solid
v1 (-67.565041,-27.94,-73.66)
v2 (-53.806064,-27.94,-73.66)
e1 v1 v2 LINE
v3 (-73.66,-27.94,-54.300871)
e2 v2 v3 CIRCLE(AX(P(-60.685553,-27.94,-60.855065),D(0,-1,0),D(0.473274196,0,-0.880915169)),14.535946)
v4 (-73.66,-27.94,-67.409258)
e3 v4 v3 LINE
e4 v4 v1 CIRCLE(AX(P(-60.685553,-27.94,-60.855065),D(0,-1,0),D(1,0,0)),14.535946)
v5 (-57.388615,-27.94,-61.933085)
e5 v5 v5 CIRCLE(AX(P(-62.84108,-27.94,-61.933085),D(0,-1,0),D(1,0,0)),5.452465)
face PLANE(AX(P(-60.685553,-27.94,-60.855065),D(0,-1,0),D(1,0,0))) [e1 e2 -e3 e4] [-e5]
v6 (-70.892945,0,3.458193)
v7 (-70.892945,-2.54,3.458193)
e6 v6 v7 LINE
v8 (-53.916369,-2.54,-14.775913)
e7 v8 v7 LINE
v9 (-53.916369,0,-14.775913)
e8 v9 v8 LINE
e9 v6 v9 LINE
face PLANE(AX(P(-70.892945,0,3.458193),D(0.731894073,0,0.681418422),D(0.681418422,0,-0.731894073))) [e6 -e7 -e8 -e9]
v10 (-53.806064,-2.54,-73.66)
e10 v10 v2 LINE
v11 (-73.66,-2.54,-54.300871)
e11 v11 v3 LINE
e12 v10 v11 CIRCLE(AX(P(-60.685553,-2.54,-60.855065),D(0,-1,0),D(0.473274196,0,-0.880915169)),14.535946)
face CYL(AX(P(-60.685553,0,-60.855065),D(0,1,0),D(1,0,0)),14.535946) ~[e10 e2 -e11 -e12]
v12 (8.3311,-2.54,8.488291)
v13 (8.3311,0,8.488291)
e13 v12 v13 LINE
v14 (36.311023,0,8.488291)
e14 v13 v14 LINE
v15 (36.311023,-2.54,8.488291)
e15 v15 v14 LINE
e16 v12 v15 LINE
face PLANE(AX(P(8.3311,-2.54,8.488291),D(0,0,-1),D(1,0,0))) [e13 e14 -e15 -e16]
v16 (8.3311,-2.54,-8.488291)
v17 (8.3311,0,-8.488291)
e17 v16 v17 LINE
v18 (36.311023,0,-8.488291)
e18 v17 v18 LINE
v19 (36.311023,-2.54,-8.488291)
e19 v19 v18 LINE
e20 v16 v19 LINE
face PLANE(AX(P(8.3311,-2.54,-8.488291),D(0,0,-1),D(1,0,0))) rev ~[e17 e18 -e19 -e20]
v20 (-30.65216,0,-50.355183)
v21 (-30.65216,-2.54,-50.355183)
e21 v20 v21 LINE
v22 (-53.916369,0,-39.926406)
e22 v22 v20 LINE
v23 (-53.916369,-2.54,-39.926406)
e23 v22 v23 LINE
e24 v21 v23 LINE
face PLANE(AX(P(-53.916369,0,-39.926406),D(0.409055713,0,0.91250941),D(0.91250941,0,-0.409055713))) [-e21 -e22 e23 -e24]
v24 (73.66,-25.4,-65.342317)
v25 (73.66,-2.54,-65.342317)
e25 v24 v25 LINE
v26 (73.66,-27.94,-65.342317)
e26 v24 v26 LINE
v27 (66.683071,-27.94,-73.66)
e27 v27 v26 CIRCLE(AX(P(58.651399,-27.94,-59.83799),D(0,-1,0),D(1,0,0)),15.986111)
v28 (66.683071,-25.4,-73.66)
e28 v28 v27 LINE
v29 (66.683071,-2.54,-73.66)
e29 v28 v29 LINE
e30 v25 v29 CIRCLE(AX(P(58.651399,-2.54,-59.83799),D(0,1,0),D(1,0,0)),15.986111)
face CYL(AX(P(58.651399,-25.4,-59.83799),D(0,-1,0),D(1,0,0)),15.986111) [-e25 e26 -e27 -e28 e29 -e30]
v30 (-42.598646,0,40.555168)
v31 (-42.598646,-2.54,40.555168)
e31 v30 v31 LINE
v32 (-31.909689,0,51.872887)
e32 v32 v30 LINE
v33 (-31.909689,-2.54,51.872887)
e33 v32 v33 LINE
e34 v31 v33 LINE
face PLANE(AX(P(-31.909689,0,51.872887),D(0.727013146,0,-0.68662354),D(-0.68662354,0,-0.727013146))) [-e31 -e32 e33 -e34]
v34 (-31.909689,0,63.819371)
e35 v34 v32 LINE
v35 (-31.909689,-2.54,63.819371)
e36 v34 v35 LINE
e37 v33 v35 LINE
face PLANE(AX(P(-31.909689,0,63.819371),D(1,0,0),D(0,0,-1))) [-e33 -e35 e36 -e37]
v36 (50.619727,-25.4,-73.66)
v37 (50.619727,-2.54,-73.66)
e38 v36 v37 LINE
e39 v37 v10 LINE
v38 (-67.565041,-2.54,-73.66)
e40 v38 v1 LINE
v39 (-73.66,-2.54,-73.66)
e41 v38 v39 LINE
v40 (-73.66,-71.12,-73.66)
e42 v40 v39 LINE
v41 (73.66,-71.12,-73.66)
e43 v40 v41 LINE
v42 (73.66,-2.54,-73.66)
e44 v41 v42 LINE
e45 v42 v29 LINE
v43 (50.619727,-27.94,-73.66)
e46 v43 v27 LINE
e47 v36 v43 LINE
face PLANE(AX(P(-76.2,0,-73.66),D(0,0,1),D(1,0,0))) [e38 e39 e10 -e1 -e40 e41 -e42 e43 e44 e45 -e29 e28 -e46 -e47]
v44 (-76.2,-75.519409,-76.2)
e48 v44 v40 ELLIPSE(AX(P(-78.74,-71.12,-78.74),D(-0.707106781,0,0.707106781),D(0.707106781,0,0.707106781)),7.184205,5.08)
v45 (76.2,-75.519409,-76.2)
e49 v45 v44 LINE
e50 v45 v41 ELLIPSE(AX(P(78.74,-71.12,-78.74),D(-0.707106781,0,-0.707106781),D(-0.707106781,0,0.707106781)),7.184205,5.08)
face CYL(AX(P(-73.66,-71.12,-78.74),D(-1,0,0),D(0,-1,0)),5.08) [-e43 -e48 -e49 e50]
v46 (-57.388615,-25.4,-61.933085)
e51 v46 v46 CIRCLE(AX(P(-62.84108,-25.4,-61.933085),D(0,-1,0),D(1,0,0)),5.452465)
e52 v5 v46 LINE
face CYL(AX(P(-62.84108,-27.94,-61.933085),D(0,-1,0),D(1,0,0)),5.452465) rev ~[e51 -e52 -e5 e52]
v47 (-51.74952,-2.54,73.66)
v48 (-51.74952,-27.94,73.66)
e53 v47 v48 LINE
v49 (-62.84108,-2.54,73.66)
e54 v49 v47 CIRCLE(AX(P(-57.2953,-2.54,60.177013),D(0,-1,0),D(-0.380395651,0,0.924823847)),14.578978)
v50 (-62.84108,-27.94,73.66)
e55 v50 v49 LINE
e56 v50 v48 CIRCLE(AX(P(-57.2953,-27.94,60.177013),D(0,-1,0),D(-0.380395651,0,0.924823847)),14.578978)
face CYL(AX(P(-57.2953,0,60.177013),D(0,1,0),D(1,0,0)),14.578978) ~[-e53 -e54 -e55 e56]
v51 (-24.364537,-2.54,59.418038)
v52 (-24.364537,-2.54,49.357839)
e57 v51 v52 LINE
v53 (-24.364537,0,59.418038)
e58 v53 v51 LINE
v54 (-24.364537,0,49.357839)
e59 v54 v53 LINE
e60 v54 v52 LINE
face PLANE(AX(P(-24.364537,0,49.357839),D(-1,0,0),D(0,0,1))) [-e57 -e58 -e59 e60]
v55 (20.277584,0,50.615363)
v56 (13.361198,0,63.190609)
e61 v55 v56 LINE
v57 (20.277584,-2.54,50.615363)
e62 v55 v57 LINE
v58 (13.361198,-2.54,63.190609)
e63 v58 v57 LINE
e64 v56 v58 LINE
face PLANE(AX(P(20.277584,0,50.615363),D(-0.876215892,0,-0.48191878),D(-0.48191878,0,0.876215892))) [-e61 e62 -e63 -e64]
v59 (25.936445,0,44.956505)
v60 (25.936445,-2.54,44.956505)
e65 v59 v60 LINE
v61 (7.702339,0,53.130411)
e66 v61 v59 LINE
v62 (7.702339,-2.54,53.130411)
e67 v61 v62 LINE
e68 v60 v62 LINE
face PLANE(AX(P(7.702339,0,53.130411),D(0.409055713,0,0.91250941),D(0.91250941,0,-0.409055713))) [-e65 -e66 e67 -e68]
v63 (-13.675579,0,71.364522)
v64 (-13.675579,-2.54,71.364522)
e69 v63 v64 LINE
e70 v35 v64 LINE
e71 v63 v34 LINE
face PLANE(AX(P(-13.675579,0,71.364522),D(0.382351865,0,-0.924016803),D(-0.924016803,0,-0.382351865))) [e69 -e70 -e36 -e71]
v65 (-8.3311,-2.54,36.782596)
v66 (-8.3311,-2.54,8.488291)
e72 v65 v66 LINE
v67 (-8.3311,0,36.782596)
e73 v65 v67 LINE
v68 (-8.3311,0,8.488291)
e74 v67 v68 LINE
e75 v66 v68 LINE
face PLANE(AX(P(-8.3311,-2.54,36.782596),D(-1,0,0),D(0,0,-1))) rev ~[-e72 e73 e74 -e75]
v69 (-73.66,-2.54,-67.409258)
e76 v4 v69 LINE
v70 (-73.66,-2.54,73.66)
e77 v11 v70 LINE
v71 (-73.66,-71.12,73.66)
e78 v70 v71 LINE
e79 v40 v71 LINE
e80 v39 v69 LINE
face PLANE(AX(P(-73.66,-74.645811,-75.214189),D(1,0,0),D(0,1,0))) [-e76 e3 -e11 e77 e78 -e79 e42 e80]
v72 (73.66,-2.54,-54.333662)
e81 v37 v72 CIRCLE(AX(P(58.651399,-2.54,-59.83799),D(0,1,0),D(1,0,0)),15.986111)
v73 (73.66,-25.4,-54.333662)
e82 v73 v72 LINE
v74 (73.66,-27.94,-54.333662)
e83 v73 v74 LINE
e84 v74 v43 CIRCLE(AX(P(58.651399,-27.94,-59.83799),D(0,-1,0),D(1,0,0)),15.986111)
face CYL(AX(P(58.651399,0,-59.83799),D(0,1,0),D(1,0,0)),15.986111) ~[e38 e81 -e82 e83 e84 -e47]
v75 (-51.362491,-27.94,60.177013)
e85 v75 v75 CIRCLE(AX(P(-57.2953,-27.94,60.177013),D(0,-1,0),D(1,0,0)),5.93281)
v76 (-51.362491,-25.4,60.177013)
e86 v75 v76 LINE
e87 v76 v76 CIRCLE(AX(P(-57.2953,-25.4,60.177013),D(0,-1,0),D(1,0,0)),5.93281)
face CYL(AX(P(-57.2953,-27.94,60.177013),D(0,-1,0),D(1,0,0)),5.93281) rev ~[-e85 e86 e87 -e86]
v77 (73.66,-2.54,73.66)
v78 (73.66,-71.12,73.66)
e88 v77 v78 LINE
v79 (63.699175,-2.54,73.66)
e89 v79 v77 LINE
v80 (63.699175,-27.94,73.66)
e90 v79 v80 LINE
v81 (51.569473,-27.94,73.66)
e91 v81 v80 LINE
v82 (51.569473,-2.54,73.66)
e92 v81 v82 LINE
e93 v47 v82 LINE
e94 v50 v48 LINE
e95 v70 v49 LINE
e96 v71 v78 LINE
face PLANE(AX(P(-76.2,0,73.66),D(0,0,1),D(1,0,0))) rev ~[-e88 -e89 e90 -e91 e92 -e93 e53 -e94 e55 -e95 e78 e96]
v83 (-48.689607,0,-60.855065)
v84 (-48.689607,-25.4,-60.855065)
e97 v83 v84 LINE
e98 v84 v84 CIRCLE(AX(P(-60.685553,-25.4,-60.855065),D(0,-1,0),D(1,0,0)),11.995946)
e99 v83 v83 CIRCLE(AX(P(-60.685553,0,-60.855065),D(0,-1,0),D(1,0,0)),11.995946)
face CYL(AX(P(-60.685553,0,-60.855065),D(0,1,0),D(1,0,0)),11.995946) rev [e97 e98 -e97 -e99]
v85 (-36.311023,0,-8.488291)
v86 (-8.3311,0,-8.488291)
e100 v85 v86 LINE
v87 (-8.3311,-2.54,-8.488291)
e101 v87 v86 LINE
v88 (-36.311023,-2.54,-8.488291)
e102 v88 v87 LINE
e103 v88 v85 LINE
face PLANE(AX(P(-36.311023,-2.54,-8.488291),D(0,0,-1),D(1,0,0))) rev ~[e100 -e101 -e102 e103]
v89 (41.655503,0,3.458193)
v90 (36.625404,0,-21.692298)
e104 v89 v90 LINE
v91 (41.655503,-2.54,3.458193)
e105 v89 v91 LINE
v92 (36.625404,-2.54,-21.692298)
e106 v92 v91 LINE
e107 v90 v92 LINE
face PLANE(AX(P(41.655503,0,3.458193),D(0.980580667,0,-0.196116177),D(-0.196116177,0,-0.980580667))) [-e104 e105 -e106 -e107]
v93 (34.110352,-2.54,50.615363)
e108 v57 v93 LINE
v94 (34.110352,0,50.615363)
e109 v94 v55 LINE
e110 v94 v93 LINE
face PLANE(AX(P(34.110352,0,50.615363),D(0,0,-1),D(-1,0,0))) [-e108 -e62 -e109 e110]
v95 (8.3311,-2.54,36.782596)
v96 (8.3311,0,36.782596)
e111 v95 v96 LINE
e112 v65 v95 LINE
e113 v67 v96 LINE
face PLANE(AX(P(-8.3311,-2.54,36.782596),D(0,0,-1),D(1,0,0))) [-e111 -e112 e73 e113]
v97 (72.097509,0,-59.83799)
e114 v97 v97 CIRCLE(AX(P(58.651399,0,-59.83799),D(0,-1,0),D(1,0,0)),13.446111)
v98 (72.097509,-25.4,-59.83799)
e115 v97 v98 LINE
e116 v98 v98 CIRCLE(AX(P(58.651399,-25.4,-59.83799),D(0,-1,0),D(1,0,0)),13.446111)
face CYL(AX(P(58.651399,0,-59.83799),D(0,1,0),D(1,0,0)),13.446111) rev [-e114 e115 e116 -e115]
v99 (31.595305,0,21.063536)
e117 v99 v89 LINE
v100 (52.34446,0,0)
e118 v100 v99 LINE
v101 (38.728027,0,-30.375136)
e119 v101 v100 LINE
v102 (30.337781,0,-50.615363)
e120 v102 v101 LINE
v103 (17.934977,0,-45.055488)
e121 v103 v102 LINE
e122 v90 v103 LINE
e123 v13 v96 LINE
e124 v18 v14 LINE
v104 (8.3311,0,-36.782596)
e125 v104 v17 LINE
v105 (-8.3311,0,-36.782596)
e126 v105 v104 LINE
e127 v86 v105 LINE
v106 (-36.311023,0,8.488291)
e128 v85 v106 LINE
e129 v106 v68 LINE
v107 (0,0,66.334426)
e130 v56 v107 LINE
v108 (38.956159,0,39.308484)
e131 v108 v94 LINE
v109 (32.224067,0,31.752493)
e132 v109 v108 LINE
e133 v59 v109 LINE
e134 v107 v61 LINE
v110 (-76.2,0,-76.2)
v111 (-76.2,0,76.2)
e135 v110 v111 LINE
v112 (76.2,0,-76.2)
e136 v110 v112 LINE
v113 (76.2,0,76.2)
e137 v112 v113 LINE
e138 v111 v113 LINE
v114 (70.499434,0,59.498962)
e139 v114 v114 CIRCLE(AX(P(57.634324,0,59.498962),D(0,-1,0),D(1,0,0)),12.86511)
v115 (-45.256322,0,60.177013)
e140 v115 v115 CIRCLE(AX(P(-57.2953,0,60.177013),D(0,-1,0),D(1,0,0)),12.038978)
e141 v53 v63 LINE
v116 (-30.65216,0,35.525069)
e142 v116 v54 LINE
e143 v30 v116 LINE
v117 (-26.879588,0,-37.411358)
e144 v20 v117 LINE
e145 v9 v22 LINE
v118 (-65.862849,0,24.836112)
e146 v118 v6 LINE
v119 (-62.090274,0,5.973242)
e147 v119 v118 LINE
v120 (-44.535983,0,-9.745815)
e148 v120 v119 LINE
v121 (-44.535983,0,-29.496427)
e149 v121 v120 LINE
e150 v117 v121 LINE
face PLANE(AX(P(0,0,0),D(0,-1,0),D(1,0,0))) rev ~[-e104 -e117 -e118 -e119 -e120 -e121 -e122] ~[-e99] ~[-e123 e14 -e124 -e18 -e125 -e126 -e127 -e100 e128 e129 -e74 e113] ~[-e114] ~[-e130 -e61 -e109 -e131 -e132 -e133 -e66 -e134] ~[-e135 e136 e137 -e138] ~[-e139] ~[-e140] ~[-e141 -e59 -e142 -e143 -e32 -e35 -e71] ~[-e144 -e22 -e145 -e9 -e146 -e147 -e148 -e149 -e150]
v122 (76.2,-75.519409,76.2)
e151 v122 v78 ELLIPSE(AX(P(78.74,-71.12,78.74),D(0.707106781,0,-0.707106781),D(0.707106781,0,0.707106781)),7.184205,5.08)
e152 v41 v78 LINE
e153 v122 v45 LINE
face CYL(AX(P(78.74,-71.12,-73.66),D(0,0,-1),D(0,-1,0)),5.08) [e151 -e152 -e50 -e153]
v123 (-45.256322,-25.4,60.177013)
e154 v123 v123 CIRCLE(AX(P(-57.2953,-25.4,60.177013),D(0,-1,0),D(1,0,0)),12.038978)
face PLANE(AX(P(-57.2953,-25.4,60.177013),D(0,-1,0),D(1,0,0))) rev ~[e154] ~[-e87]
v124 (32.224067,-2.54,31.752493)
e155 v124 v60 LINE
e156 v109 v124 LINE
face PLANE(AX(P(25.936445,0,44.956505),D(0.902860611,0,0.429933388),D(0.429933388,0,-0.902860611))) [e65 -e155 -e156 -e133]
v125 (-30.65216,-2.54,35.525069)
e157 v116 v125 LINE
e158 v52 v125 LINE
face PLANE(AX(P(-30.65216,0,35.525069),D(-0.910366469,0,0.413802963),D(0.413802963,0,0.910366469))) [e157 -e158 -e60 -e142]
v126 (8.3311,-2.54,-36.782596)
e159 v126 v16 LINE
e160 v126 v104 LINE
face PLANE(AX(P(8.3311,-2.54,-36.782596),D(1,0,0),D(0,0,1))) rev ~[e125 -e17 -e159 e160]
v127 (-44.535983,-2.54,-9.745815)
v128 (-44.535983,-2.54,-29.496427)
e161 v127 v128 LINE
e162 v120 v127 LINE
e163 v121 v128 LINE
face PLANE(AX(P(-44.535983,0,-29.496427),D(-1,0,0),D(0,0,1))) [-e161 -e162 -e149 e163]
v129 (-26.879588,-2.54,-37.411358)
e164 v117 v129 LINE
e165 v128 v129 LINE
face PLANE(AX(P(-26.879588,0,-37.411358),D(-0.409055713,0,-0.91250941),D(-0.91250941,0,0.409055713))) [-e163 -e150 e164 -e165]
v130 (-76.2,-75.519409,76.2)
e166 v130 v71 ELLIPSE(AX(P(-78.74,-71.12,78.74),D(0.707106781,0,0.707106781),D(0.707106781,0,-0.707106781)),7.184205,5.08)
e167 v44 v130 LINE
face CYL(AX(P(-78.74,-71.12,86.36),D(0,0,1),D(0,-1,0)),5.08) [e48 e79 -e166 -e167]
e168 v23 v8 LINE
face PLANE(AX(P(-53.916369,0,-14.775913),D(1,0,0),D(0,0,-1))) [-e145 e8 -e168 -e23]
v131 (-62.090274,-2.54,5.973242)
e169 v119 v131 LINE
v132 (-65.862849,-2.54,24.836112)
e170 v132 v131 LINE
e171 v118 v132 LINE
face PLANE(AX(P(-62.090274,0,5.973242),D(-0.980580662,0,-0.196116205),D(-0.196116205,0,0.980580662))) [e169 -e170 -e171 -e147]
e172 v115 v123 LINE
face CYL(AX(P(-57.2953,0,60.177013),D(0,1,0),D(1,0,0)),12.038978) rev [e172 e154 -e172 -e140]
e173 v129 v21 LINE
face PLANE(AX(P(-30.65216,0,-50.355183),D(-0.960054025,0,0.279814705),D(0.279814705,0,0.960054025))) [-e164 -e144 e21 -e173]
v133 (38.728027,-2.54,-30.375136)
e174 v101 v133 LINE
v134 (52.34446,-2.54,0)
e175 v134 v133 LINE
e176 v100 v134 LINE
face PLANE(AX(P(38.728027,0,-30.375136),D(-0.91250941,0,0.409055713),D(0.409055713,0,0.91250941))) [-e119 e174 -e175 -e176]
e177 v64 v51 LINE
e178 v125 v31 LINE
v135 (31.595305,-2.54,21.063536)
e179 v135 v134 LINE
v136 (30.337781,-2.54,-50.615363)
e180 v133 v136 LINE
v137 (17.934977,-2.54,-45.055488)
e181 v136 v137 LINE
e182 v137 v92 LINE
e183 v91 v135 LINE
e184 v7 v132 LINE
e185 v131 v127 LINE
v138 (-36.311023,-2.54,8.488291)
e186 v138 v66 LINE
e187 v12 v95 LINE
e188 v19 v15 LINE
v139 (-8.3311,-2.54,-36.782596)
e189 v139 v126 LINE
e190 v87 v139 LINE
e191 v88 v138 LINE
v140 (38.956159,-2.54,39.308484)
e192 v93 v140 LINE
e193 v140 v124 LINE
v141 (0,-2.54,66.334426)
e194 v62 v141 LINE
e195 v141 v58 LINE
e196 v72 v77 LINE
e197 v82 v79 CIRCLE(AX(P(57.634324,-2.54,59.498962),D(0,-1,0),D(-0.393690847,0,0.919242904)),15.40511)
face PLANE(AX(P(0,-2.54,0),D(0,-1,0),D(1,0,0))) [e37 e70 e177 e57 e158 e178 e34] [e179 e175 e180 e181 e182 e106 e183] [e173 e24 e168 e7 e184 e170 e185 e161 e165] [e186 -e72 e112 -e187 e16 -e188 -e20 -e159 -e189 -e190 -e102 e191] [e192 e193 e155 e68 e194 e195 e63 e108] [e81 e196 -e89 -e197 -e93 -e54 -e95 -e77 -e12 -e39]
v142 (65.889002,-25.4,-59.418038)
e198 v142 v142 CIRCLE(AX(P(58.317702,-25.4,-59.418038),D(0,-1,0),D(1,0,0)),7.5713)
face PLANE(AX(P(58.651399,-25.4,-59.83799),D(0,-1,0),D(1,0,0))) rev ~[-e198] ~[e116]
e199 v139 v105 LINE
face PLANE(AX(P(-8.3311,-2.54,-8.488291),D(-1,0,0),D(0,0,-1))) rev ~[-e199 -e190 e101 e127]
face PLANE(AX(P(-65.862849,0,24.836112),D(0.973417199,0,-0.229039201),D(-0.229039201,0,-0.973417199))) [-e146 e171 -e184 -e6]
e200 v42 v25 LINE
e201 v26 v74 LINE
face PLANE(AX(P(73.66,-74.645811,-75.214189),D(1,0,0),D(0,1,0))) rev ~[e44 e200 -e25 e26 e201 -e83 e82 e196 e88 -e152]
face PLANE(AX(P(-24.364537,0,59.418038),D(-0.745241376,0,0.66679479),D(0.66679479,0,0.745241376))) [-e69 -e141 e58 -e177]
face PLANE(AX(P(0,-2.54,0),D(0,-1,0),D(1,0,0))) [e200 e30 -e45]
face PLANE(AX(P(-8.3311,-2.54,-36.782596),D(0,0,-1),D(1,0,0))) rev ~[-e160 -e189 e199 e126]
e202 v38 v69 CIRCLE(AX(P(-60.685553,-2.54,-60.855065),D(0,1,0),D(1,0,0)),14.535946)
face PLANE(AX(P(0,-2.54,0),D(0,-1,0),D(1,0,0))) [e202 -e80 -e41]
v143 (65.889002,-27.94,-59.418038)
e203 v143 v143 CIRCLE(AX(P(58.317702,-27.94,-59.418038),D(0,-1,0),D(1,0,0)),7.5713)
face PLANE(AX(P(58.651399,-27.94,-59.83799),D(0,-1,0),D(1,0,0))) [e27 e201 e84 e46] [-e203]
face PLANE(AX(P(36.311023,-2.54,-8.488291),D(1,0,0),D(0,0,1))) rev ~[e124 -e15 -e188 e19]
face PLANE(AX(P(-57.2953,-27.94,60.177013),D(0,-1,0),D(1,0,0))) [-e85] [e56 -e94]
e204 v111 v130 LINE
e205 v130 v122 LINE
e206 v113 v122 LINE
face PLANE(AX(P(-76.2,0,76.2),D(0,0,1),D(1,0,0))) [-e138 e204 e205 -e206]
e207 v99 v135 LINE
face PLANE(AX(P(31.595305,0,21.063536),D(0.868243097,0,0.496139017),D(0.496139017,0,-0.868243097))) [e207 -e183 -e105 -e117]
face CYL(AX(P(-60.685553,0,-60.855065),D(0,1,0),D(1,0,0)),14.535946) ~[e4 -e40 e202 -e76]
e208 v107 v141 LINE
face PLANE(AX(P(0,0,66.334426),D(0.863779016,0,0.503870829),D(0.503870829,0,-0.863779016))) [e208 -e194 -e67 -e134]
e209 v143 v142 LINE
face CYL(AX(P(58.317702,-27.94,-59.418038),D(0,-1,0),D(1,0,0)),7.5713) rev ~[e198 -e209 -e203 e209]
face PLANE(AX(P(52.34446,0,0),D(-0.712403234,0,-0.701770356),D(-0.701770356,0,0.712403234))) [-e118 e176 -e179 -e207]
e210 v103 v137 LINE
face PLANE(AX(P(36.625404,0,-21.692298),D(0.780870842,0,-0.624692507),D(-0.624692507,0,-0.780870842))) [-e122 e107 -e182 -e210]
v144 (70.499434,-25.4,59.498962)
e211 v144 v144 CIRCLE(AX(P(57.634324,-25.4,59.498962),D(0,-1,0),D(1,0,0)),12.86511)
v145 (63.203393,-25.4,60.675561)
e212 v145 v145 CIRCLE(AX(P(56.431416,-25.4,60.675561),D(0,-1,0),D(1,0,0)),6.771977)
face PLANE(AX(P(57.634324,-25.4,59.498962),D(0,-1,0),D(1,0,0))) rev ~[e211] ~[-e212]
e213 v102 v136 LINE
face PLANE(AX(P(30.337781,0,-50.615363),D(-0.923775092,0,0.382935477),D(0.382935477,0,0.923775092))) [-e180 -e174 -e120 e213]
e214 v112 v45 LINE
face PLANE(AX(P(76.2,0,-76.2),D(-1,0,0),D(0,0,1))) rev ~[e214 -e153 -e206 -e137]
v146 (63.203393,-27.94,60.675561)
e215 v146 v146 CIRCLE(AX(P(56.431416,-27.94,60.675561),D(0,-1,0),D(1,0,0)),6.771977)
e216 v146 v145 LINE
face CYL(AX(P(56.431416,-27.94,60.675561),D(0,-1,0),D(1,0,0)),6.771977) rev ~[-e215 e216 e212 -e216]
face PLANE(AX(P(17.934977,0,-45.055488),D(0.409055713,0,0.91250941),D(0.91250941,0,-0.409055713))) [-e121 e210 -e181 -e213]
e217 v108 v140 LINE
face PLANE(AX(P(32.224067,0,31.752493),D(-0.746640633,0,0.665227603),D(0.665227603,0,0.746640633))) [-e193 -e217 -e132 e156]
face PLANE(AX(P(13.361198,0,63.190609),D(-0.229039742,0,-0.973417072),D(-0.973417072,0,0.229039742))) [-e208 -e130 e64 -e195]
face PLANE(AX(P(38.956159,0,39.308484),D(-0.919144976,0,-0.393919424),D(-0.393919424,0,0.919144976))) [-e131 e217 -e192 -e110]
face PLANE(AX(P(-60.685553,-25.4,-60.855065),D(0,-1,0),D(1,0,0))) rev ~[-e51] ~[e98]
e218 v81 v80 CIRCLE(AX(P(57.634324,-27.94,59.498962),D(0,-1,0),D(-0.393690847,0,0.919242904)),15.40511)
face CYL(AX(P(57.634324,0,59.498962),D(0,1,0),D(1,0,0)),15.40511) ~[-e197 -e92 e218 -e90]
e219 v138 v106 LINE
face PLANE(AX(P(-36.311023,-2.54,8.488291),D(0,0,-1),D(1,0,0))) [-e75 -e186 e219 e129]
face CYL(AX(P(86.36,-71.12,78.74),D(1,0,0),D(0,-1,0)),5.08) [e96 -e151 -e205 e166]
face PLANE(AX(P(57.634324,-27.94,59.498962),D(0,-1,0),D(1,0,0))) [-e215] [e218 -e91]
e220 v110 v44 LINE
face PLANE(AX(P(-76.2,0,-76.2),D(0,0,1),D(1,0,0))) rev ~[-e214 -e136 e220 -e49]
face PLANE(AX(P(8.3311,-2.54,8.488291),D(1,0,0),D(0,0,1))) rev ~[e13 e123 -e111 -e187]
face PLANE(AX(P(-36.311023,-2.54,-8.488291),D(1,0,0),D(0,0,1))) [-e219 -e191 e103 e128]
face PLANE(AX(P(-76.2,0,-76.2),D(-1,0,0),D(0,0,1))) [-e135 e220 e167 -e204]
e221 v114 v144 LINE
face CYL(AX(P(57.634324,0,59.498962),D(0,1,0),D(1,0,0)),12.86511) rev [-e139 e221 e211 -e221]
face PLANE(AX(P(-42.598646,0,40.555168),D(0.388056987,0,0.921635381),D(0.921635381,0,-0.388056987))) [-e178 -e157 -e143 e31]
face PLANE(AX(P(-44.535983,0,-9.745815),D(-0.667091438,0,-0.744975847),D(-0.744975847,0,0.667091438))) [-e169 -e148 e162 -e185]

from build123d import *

# Parameters (mm, degrees)
F0_W         = 152.4
F0_H         = 152.4
F1_DEPTH     = 76.2
F2_R         = 12.8651099241
F2_R_2       = 12.0389782125
F2_R_3       = 13.4461105648
F2_R_4       = 11.9959461494
F3_DEPTH     = 25.4
F4_T         = 2.54
F5_T1_DEPTH  = 147.32
F5_T3_DEPTH  = 147.32
F5_T9_DEPTH  = 160.02
F5_T15_DEPTH = 160.02
F5_T24_DEPTH = 160.02
F5_T30_DEPTH = 160.02
F5_T39_DEPTH = 160.02
F5_T45_DEPTH = 160.02
F5_T54_DEPTH = 160.02
F5_T60_DEPTH = 160.02
F6_W         = 16.6622009128
F6_H         = 28.2943053171
F6_H_2       = 16.9765818864
F6_W_2       = 27.9799224809
F7_DEPTH     = 25.4
F8_R         = 5.4524649891
F8_R_2       = 5.9328095345
F8_R_3       = 6.7719768786
F8_R_4       = 7.5712998573
F9_DEPTH     = 25.4
F11_DEPTH    = 25.4


# Not quite as in the source:
# - a fillet or chamfer that OpenCascade refuses, or shapes differently, is made with other operations: its cross-section is extruded or revolved along the edge and cut away or added
# - a shell that OpenCascade refuses in one call is made with other operations: the cavity is built on its own and cut out


with BuildPart() as f1:
    # F0 (on Front) → F1 (new body)
    with BuildSketch(Plane.XZ):
        Rectangle(F0_W, F0_H)
    extrude(amount=F1_DEPTH)

    # F2 (on face) → F3 (cut)
    with BuildSketch(Plane.XZ):
        with Locations((57.6343238354, 59.4989620149)):
            Circle(F2_R)
        with Locations((-57.2953000665, 60.177013278)):
            Circle(F2_R_2)
        with Locations((58.6513988674, -59.8379895091)):
            Circle(F2_R_3)
        with Locations((-60.6855526567, -60.8550645411)):
            Circle(F2_R_4)
    extrude(amount=F3_DEPTH, mode=Mode.SUBTRACT)

    # F4: shell of thickness 2.54, made by hand


with BuildPart() as f4_core1:
    # F4_t2: copy of F1
    add(f1.part)

    # the walls: a layer under each face that stays
    f4_faces = [f4_core1.faces().sort_by_distance(p)[0] for p in [
        (0, -38.1, 76.2),
        (76.2, -38.1, 0),
        (-76.2, -38.1, 0),
        (0, 0, 0),
        (0, -38.1, -76.2),
        (-72.681498806, -12.7, -60.8550645411),
        (45.2052883026, -12.7, -59.8379895091),
        (-69.334278279, -12.7, 60.177013278),
        (44.7692139113, -12.7, 59.4989620149),
        (-60.6855526567, -25.4, -60.8550645411),
        (58.6513988674, -25.4, -59.8379895091),
        (-57.2953000665, -25.4, 60.177013278),
        (57.6343238354, -25.4, 59.4989620149),
    ]]
    thicken(f4_faces, amount=-F4_T, mode=Mode.SUBTRACT)

    # F4_s3 → F4_t4 (revolve, cut)
    with BuildSketch(Plane.XY.offset(-60.8550645411)):
        Polygon((-48.7150065073, -25.3746), (-46.1496065073, -25.4), (-46.1496065073, -27.94), (-48.6896065073, -27.94), align=None)
    revolve(axis=Axis((-60.6855526567, -25.4, -60.8550645411), (0, -1, 0)), mode=Mode.SUBTRACT)

    # F4_s5 → F4_t6 (revolve, cut)
    with BuildSketch(Plane.XY.offset(-59.8379895091)):
        Polygon((72.0721094321, -25.3746), (74.6375094321, -25.4), (74.6375094321, -27.94), (72.0975094321, -27.94), align=None)
    revolve(axis=Axis((58.6513988674, -25.4, -59.8379895091), (0, -1, 0)), mode=Mode.SUBTRACT)

    # F4_s7 → F4_t8 (revolve, cut)
    with BuildSketch(Plane.XY.offset(60.177013278)):
        Polygon((-45.281721854, -25.3746), (-42.716321854, -25.4), (-42.716321854, -27.94), (-45.256321854, -27.94), align=None)
    revolve(axis=Axis((-57.2953000665, -25.4, 60.177013278), (0, -1, 0)), mode=Mode.SUBTRACT)

    # F4_s9 → F4_t10 (revolve, cut)
    with BuildSketch(Plane.XY.offset(59.4989620149)):
        Polygon((70.4740337595, -25.3746), (73.0394337595, -25.4), (73.0394337595, -27.94), (70.4994337595, -27.94), align=None)
    revolve(axis=Axis((57.6343238354, -25.4, 59.4989620149), (0, -1, 0)), mode=Mode.SUBTRACT)


with BuildPart() as f1_1:
    add(f1.part)

    # what is left inside the walls is the cavity
    f4_cavity = [f4_core1.part.solids().sort_by_distance(p)[0] for p in [
        (0, -76.1746, -24.553333),
    ]]
    add(f4_cavity, mode=Mode.SUBTRACT)

    # F5: fillet of radius 5.08 on 4 edges, made by hand

    # F5_s2 → F5_t1 (cut)
    with BuildSketch(Plane.YZ.offset(-73.66)):
        with BuildLine():
            ThreePointArc((-76.2, 78.74), (-74.7121024484, 75.1478975516), (-71.12, 73.66))
            Line((-71.12, 73.66), (-76.2, 73.66))
            Line((-76.2, 73.66), (-76.2, 78.74))
        make_face()
        with BuildLine():
            ThreePointArc((-76.2, -78.74), (-74.7121024484, -75.1478975516), (-71.12, -73.66))
            Line((-71.12, -73.66), (-76.2, -73.66))
            Line((-76.2, -73.66), (-76.2, -78.74))
        make_face()
    extrude(amount=F5_T1_DEPTH, mode=Mode.SUBTRACT)

    # F5_s4 → F5_t3 (cut)
    with BuildSketch(Plane.XY.offset(-73.66)):
        with BuildLine():
            ThreePointArc((-78.74, -76.2), (-75.1478975516, -74.7121024484), (-73.66, -71.12))
            Line((-73.66, -71.12), (-73.66, -76.2))
            Line((-73.66, -76.2), (-78.74, -76.2))
        make_face()
        with BuildLine():
            ThreePointArc((78.74, -76.2), (75.1478975516, -74.7121024484), (73.66, -71.12))
            Line((73.66, -71.12), (73.66, -76.2))
            Line((73.66, -76.2), (78.74, -76.2))
        make_face()
    extrude(amount=F5_T3_DEPTH, mode=Mode.SUBTRACT)


with BuildPart() as f5_tool7:
    # F5_s8 → F5_t9 (new body)
    with BuildSketch(Plane.YZ.offset(86.36)):
        with BuildLine():
            ThreePointArc((-76.2, 78.74), (-74.7121024484, 75.1478975516), (-71.12, 73.66))
            Line((-71.12, 73.66), (-76.2, 73.66))
            Line((-76.2, 73.66), (-76.2, 78.74))
        make_face()
    extrude(amount=-F5_T9_DEPTH)

    split(bisect_by=Plane.XY.offset(76.2), keep=Keep.BOTTOM)

    split(bisect_by=Plane.YZ.offset(76.2), keep=Keep.BOTTOM)

    split(bisect_by=Plane.YZ.offset(73.66), keep=Keep.TOP)


with BuildPart() as f5_tool13:
    # F5_s14 → F5_t15 (new body)
    with BuildSketch(Plane.XY.offset(-73.66)):
        with BuildLine():
            ThreePointArc((78.74, -76.2), (75.1478975516, -74.7121024484), (73.66, -71.12))
            Line((73.66, -71.12), (73.66, -76.2))
            Line((73.66, -76.2), (78.74, -76.2))
        make_face()
    extrude(amount=F5_T15_DEPTH)

    split(bisect_by=Plane.XY.offset(76.2), keep=Keep.BOTTOM)

    split(bisect_by=Plane.YZ.offset(76.2), keep=Keep.BOTTOM)

    split(bisect_by=Plane.XY.offset(73.66), keep=Keep.TOP)


with BuildPart() as f5_tool7_1:
    add(f5_tool7.part)

    # F5_t19: intersect F5_tool13
    add(f5_tool13.part, mode=Mode.INTERSECT)


with BuildPart() as f1_2:
    add(f1_1.part)

    # F5_t5: cut F5_tool7
    add(f5_tool7_1.part, mode=Mode.SUBTRACT)


with BuildPart() as f5_tool22:
    # F5_s23 → F5_t24 (new body)
    with BuildSketch(Plane.YZ.offset(73.66)):
        with BuildLine():
            ThreePointArc((-76.2, 78.74), (-74.7121024484, 75.1478975516), (-71.12, 73.66))
            Line((-71.12, 73.66), (-76.2, 73.66))
            Line((-76.2, 73.66), (-76.2, 78.74))
        make_face()
    extrude(amount=-F5_T24_DEPTH)

    split(bisect_by=Plane.XY.offset(76.2), keep=Keep.BOTTOM)

    split(bisect_by=Plane.YZ.offset(-76.2), keep=Keep.TOP)

    split(bisect_by=Plane.YZ.offset(-73.66), keep=Keep.BOTTOM)


with BuildPart() as f5_tool28:
    # F5_s29 → F5_t30 (new body)
    with BuildSketch(Plane.XY.offset(86.36)):
        with BuildLine():
            ThreePointArc((-78.74, -76.2), (-75.1478975516, -74.7121024484), (-73.66, -71.12))
            Line((-73.66, -71.12), (-73.66, -76.2))
            Line((-73.66, -76.2), (-78.74, -76.2))
        make_face()
    extrude(amount=-F5_T30_DEPTH)

    split(bisect_by=Plane.XY.offset(76.2), keep=Keep.BOTTOM)

    split(bisect_by=Plane.YZ.offset(-76.2), keep=Keep.TOP)

    split(bisect_by=Plane.XY.offset(73.66), keep=Keep.TOP)


with BuildPart() as f5_tool22_1:
    add(f5_tool22.part)

    # F5_t34: intersect F5_tool28
    add(f5_tool28.part, mode=Mode.INTERSECT)


with BuildPart() as f1_3:
    add(f1_2.part)

    # F5_t20: cut F5_tool22
    add(f5_tool22_1.part, mode=Mode.SUBTRACT)


with BuildPart() as f5_tool37:
    # F5_s38 → F5_t39 (new body)
    with BuildSketch(Plane.XY.offset(73.66)):
        with BuildLine():
            ThreePointArc((-78.74, -76.2), (-75.1478975516, -74.7121024484), (-73.66, -71.12))
            Line((-73.66, -71.12), (-73.66, -76.2))
            Line((-73.66, -76.2), (-78.74, -76.2))
        make_face()
    extrude(amount=-F5_T39_DEPTH)

    split(bisect_by=Plane.YZ.offset(-76.2), keep=Keep.TOP)

    split(bisect_by=Plane.XY.offset(-76.2), keep=Keep.TOP)

    split(bisect_by=Plane.XY.offset(-73.66), keep=Keep.BOTTOM)


with BuildPart() as f5_tool43:
    # F5_s44 → F5_t45 (new body)
    with BuildSketch(Plane.YZ.offset(-86.36)):
        with BuildLine():
            ThreePointArc((-76.2, -78.74), (-74.7121024484, -75.1478975516), (-71.12, -73.66))
            Line((-71.12, -73.66), (-76.2, -73.66))
            Line((-76.2, -73.66), (-76.2, -78.74))
        make_face()
    extrude(amount=F5_T45_DEPTH)

    split(bisect_by=Plane.YZ.offset(-76.2), keep=Keep.TOP)

    split(bisect_by=Plane.XY.offset(-76.2), keep=Keep.TOP)

    split(bisect_by=Plane.YZ.offset(-73.66), keep=Keep.BOTTOM)


with BuildPart() as f5_tool37_1:
    add(f5_tool37.part)

    # F5_t49: intersect F5_tool43
    add(f5_tool43.part, mode=Mode.INTERSECT)


with BuildPart() as f1_4:
    add(f1_3.part)

    # F5_t35: cut F5_tool37
    add(f5_tool37_1.part, mode=Mode.SUBTRACT)


with BuildPart() as f5_tool52:
    # F5_s53 → F5_t54 (new body)
    with BuildSketch(Plane.YZ.offset(-73.66)):
        with BuildLine():
            ThreePointArc((-76.2, -78.74), (-74.7121024484, -75.1478975516), (-71.12, -73.66))
            Line((-71.12, -73.66), (-76.2, -73.66))
            Line((-76.2, -73.66), (-76.2, -78.74))
        make_face()
    extrude(amount=F5_T54_DEPTH)

    split(bisect_by=Plane.YZ.offset(76.2), keep=Keep.BOTTOM)

    split(bisect_by=Plane.XY.offset(-76.2), keep=Keep.TOP)

    split(bisect_by=Plane.YZ.offset(73.66), keep=Keep.TOP)


with BuildPart() as f5_tool58:
    # F5_s59 → F5_t60 (new body)
    with BuildSketch(Plane.XY.offset(-86.36)):
        with BuildLine():
            ThreePointArc((78.74, -76.2), (75.1478975516, -74.7121024484), (73.66, -71.12))
            Line((73.66, -71.12), (73.66, -76.2))
            Line((73.66, -76.2), (78.74, -76.2))
        make_face()
    extrude(amount=F5_T60_DEPTH)

    split(bisect_by=Plane.YZ.offset(76.2), keep=Keep.BOTTOM)

    split(bisect_by=Plane.XY.offset(-76.2), keep=Keep.TOP)

    split(bisect_by=Plane.XY.offset(-73.66), keep=Keep.BOTTOM)


with BuildPart() as f5_tool52_1:
    add(f5_tool52.part)

    # F5_t64: intersect F5_tool58
    add(f5_tool58.part, mode=Mode.INTERSECT)


with BuildPart() as f1_5:
    add(f1_4.part)

    # F5_t50: cut F5_tool52
    add(f5_tool52_1.part, mode=Mode.SUBTRACT)

    # F6 (on face) → F7 (cut)
    with BuildSketch(Plane.XZ.offset(2.54)):
        with Locations((0, 22.6354436018)):
            Rectangle(F6_W, F6_H)
        Rectangle(F6_W, F6_H_2)
        with Locations((0, -22.6354436018)):
            Rectangle(F6_W, F6_H)
        with Locations((22.3210616969, 0)):
            Rectangle(F6_W_2, F6_H_2)
        with Locations((-22.3210616969, 0)):
            Rectangle(F6_W_2, F6_H_2)
    extrude(amount=-F7_DEPTH, mode=Mode.SUBTRACT)

    # F8 (on face) → F9 (cut)
    with BuildSketch(Plane.XZ.offset(27.94)):
        with Locations((-62.8410799733, -61.9330853224)):
            Circle(F8_R)
        with Locations((-57.2953000665, 60.177013278)):
            Circle(F8_R_2)
        with Locations((56.4314164221, 60.6755614281)):
            Circle(F8_R_3)
        with Locations((58.3177022636, -59.4180375338)):
            Circle(F8_R_4)
    extrude(amount=-F9_DEPTH, mode=Mode.SUBTRACT)

    # F10 (on face) → F11 (cut)
    with BuildSketch(Plane.XZ):
        Polygon((17.9349766593, -45.055488267), (30.337780714, -50.615362823), (38.728027374, -30.3751360907), (52.3444600403, 0), (31.5953046083, 21.0635364056), (41.6555032134, 3.458192572), (36.6254039109, -21.6922983527), align=None)
        Polygon((-30.652159825, -50.3551833958), (-26.879588142, -37.4113582075), (-44.5359825398, -29.4964272347), (-44.5359825398, -9.7458148375), (-62.0902739465, 5.9732417576), (-65.8628493547, 24.8361118138), (-70.892944932, 3.458192572), (-53.9163686335, -14.7759132087), (-53.9163686335, -39.9264059961), align=None)
        Polygon((-42.5986461341, 40.5551679432), (-30.652159825, 35.5250686407), (-24.3645366281, 49.3578389287), (-24.3645366281, 59.4180375338), (-13.6755788699, 71.3645219803), (-31.9096893072, 63.8193711638), (-31.9096893072, 51.8728867173), align=None)
        Polygon((32.2240665555, 31.7524932325), (38.9561592304, 39.308484465), (34.110352397, 50.615362823), (20.2775839716, 50.615362823), (13.3611978963, 63.1906092167), (0, 66.334426403), (7.7023385093, 53.1304106116), (25.9364452213, 44.9565052986), align=None)
    extrude(amount=F11_DEPTH, mode=Mode.SUBTRACT)


solid = f1_5.part
